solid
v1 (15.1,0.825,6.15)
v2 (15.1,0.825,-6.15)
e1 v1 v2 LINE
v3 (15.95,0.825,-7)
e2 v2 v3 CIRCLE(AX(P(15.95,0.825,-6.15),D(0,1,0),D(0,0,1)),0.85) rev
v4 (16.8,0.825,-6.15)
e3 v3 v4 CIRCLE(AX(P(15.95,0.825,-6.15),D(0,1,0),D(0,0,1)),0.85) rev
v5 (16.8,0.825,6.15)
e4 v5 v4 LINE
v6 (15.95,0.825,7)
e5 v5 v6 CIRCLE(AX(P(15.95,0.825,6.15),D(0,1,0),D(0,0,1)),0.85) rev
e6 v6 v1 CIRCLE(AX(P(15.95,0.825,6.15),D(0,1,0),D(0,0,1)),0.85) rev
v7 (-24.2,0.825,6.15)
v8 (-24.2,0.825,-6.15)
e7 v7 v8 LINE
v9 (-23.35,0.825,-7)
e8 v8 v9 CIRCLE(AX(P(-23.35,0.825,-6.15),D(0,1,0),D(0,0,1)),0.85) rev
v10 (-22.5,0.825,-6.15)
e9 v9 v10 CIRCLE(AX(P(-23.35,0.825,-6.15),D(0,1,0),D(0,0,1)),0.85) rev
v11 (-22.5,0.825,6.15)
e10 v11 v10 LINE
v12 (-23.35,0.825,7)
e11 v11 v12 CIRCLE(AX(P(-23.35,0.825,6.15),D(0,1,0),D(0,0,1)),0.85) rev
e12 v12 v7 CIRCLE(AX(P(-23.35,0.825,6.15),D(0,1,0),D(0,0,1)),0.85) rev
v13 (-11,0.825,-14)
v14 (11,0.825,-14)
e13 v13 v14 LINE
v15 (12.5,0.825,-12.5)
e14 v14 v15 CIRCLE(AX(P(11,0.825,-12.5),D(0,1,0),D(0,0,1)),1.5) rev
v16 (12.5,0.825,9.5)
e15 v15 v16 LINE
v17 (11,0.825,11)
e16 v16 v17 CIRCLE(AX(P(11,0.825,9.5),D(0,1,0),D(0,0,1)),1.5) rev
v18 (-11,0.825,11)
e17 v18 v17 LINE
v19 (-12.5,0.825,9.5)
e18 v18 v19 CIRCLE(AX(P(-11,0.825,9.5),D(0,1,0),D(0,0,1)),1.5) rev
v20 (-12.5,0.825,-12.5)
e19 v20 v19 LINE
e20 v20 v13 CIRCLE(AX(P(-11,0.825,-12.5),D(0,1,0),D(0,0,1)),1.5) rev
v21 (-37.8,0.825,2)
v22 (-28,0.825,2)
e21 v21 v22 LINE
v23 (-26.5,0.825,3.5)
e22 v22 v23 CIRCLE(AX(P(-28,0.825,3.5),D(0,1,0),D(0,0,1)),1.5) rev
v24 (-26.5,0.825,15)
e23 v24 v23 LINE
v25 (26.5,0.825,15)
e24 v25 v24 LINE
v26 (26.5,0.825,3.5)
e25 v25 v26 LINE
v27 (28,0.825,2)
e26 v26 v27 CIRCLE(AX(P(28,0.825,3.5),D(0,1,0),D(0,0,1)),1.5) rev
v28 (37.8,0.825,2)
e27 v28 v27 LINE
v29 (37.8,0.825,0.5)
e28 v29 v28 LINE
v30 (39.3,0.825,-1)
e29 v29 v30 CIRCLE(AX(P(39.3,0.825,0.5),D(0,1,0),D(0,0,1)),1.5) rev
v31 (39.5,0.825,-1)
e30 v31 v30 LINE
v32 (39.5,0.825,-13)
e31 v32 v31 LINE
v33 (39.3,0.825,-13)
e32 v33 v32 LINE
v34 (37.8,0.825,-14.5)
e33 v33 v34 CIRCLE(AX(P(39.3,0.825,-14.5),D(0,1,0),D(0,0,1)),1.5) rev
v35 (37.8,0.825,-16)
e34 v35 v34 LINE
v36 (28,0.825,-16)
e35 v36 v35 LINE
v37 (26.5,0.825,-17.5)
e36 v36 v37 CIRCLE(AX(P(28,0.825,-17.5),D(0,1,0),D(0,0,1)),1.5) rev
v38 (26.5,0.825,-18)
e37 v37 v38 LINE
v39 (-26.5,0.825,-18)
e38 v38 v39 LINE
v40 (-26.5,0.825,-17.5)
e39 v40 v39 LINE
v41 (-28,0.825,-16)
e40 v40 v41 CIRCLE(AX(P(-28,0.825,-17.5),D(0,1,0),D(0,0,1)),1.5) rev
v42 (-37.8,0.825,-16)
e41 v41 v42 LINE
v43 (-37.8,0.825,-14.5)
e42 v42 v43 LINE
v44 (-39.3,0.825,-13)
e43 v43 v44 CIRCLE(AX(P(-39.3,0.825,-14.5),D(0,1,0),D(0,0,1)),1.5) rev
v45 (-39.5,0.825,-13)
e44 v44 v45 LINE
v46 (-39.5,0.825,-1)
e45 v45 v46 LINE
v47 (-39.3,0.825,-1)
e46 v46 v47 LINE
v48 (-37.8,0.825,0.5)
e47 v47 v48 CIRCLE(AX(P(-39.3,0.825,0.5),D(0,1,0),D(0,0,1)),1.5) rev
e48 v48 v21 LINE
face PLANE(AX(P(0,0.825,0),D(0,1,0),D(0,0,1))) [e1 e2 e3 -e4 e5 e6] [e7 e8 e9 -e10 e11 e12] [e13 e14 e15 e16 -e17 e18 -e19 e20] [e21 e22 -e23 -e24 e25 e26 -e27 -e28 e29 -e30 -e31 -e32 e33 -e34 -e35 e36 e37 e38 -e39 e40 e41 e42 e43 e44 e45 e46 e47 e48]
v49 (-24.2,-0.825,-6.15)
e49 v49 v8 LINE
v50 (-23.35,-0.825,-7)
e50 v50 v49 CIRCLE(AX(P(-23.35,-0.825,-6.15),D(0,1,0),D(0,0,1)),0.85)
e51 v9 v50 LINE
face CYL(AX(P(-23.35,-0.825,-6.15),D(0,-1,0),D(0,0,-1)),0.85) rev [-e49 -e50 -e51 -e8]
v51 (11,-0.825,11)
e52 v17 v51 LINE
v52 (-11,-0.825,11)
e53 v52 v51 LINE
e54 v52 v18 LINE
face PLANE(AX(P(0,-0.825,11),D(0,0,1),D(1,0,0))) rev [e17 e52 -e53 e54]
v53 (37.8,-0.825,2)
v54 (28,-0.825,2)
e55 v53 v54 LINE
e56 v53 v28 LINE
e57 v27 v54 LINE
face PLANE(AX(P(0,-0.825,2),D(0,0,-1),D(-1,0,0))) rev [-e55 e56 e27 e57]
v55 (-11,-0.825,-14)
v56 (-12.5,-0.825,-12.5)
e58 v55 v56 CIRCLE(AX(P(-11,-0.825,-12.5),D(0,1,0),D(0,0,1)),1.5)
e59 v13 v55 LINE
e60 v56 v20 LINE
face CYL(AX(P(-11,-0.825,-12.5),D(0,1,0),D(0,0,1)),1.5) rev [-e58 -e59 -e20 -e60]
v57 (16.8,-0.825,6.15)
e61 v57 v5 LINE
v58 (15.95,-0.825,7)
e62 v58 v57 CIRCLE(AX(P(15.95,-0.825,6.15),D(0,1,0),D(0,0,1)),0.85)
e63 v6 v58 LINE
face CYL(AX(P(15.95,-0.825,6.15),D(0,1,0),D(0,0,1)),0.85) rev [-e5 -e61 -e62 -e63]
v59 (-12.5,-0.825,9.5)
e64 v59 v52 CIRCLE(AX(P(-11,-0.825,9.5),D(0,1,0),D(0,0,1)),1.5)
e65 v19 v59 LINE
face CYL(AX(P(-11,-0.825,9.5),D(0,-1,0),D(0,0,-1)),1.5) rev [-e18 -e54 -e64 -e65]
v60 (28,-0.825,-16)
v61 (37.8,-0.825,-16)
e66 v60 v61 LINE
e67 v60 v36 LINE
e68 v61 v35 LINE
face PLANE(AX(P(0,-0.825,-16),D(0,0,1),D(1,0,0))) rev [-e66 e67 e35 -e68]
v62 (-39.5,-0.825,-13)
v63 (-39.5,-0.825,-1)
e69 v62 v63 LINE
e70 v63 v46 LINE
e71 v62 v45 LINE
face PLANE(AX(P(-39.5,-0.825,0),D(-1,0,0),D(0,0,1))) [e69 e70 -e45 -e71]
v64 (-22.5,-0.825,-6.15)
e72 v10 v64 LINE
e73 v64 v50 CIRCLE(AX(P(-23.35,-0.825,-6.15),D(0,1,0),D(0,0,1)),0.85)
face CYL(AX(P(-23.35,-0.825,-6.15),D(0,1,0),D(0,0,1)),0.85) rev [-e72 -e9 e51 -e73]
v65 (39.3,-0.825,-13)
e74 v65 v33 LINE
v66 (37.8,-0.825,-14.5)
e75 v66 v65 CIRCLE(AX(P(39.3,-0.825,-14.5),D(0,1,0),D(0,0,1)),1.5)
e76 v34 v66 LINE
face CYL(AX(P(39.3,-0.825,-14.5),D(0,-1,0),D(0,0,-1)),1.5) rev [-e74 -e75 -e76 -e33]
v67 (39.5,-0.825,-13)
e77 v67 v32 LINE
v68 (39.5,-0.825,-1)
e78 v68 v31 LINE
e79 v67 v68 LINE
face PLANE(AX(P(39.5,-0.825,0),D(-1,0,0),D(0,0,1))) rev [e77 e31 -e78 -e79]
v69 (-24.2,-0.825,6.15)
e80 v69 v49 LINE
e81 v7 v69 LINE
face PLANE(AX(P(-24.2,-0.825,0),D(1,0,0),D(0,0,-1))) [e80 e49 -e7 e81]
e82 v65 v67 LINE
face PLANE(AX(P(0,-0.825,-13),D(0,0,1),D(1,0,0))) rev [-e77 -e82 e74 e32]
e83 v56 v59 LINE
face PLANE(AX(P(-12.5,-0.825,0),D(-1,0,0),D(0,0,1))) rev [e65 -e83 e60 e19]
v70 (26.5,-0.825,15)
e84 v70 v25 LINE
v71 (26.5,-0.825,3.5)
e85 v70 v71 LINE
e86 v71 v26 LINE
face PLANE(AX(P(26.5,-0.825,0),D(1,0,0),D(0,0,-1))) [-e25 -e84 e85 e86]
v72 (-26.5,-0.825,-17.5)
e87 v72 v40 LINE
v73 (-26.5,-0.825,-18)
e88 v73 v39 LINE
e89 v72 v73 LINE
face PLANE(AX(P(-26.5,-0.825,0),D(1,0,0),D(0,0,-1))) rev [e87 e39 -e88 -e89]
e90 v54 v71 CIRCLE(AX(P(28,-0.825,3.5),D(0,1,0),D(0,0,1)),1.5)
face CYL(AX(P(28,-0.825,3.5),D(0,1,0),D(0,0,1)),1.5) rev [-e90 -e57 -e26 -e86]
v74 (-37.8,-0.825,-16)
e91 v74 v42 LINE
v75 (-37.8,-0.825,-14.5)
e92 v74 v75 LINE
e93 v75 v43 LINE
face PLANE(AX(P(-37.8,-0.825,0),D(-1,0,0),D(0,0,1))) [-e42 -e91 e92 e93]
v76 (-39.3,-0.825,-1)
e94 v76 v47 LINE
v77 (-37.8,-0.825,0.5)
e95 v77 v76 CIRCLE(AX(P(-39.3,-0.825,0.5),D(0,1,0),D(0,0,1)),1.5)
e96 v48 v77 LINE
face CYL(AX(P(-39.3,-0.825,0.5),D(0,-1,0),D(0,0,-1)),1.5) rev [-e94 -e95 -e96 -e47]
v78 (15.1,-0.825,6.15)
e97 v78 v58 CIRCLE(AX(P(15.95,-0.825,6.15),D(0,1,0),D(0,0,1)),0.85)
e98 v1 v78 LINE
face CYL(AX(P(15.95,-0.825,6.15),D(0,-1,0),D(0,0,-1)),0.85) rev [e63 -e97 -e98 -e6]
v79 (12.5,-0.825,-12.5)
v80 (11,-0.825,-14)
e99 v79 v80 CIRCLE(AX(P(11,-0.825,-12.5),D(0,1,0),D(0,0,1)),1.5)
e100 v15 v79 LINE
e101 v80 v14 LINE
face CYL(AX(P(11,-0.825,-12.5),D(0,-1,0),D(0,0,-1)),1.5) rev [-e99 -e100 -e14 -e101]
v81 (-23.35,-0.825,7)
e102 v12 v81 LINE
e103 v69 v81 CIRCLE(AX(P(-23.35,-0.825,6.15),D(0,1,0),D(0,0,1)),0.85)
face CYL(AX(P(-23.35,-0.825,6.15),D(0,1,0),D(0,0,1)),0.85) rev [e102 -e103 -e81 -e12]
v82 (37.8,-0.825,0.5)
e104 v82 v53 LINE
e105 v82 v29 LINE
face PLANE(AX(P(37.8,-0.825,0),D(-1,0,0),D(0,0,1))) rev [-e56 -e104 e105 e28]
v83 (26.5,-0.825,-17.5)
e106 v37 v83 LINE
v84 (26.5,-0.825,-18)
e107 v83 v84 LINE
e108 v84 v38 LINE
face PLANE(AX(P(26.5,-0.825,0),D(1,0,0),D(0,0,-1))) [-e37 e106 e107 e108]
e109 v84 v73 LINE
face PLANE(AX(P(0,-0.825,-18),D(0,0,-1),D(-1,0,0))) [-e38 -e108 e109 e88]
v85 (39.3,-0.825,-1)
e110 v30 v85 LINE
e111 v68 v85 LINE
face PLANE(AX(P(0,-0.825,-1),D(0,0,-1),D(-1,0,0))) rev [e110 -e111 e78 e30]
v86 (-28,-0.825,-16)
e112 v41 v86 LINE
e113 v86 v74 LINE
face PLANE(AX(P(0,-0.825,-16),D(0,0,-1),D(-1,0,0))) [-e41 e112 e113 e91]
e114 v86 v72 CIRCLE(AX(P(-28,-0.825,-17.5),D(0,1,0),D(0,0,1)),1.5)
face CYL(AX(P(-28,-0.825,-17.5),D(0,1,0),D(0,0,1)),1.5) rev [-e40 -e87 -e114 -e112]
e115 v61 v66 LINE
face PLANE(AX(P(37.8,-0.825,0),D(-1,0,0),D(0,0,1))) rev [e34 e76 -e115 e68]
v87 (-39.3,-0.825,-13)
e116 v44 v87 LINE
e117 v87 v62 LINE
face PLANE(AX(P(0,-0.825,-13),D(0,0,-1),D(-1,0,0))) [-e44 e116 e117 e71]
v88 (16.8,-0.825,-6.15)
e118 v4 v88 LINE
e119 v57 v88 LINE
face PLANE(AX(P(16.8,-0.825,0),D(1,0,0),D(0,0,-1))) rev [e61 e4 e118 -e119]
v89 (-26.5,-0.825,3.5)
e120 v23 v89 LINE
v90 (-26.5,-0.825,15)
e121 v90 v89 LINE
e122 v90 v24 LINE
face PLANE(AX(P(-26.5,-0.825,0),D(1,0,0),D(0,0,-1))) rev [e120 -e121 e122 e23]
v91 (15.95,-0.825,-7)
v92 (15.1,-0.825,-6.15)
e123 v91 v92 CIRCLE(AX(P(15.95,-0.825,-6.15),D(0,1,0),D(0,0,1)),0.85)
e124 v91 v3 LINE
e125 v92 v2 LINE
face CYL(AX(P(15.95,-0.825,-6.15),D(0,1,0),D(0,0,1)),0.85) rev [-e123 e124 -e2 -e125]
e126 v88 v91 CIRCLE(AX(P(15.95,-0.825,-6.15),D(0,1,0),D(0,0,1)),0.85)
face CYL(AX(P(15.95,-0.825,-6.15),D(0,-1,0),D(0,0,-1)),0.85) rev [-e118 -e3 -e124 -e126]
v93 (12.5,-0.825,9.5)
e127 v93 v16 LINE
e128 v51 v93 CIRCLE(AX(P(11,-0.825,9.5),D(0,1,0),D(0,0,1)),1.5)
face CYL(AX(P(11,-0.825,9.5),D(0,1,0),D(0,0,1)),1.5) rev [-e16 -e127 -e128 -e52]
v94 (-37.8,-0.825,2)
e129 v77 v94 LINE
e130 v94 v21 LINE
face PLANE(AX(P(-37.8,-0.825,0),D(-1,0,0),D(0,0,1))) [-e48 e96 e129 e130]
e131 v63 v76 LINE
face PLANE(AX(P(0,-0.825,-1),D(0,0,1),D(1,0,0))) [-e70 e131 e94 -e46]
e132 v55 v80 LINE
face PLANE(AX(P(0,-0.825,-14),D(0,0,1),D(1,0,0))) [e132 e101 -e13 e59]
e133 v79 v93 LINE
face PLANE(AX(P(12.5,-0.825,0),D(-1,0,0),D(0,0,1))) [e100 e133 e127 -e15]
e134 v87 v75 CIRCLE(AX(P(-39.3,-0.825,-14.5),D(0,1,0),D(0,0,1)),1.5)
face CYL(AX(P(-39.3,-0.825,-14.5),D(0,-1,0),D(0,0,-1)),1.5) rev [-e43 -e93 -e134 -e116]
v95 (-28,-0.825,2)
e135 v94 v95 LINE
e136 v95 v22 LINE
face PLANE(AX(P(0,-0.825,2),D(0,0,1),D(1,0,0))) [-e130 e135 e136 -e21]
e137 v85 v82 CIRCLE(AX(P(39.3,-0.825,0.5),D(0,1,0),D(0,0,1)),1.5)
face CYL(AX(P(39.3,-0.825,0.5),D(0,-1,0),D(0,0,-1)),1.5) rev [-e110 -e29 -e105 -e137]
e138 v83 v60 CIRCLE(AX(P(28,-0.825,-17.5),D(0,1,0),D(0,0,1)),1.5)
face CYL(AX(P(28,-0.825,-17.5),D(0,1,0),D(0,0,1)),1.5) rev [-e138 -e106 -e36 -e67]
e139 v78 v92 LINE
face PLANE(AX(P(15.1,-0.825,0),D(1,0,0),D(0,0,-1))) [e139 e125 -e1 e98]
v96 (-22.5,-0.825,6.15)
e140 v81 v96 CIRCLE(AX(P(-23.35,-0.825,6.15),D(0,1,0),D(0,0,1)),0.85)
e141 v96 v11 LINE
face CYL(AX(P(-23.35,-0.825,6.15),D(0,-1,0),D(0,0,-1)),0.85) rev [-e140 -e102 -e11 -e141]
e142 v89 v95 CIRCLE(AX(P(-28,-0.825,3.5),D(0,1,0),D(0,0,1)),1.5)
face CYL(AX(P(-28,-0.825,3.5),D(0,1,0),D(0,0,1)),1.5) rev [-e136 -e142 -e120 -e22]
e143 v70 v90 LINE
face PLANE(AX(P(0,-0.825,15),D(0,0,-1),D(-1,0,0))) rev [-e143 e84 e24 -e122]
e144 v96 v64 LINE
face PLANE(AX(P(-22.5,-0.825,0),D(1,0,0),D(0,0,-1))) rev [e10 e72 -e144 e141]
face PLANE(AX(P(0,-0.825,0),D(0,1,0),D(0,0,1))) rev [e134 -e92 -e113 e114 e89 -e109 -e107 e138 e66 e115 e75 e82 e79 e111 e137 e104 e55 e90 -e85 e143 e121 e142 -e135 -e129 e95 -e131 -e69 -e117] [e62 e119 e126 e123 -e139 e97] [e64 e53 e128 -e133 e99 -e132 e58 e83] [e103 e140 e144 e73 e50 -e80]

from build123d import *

# Parameters (mm, degrees)
SKIZZE1_W                       = 1.7
SKIZZE1_H                       = 14
SKIZZE1_W_2                     = 25
SKIZZE1_H_2                     = 25
AUFSATZ_LINEAR_AUSTRAGEN1_DEPTH = 0.825
VERRUNDUNG1_R                   = 1.5
VERRUNDUNG2_R                   = 0.85


with BuildPart() as part:
    # Skizze1 → Aufsatz-Linear austragen1 (new, symmetric)
    # profile 1 of 3: a face of its own
    with BuildSketch(Plane(origin=(0, 0, 0), x_dir=(1, 0, 0), z_dir=(0, 1, 0))):
        Polygon((26.5, 16), (26.5, 18), (-26.5, 18), (-26.5, 16), (-26.5, -2), (-26.5, -15), (26.5, -15), (26.5, -2), align=None)
        with Locations((-23.35, 0)):
            Rectangle(SKIZZE1_W, SKIZZE1_H, mode=Mode.SUBTRACT)
        with Locations((15.95, 0)):
            Rectangle(SKIZZE1_W, SKIZZE1_H, mode=Mode.SUBTRACT)
        with Locations((0, 1.5)):
            Rectangle(SKIZZE1_W_2, SKIZZE1_H_2, mode=Mode.SUBTRACT)
    # profile 2 of 3: a face of its own
    with BuildSketch(Plane(origin=(0, 0, 0), x_dir=(1, 0, 0), z_dir=(0, 1, 0))):
        Polygon((-26.5, -2), (-26.5, 16), (-37.8, 16), (-37.8, 13), (-39.5, 13), (-39.5, 1), (-37.8, 1), (-37.8, -2), align=None)
    # profile 3 of 3: a face of its own
    with BuildSketch(Plane(origin=(0, 0, 0), x_dir=(1, 0, 0), z_dir=(0, 1, 0))):
        Polygon((37.8, 16), (26.5, 16), (26.5, -2), (37.8, -2), (37.8, 1), (39.5, 1), (39.5, 13), (37.8, 13), align=None)
    extrude(amount=AUFSATZ_LINEAR_AUSTRAGEN1_DEPTH, both=True)

    # Verrundung1
    verrundung1_edges = [part.edges().sort_by_distance(p)[0] for p in [
        (-26.5, 0, 2),
        (-37.8, 0, -1),
        (-37.8, 0, -13),
        (-26.5, 0, -16),
        (26.5, 0, -16),
        (37.8, 0, -13),
        (37.8, 0, -1),
        (26.5, 0, 2),
        (-12.5, 0, -14),
        (-12.5, 0, 11),
        (12.5, 0, 11),
        (12.5, 0, -14),
    ]]
    fillet(verrundung1_edges, radius=VERRUNDUNG1_R)

    # Verrundung2
    verrundung2_edges = [part.edges().sort_by_distance(p)[0] for p in [
        (15.1, 0, 7),
        (16.8, 0, 7),
        (15.1, 0, -7),
        (16.8, 0, -7),
        (-24.2, 0, 7),
        (-22.5, 0, 7),
        (-22.5, 0, -7),
        (-24.2, 0, -7),
    ]]
    fillet(verrundung2_edges, radius=VERRUNDUNG2_R - 0.0001)  # a hair under: the kernel refuses the full size


solid = part.part
